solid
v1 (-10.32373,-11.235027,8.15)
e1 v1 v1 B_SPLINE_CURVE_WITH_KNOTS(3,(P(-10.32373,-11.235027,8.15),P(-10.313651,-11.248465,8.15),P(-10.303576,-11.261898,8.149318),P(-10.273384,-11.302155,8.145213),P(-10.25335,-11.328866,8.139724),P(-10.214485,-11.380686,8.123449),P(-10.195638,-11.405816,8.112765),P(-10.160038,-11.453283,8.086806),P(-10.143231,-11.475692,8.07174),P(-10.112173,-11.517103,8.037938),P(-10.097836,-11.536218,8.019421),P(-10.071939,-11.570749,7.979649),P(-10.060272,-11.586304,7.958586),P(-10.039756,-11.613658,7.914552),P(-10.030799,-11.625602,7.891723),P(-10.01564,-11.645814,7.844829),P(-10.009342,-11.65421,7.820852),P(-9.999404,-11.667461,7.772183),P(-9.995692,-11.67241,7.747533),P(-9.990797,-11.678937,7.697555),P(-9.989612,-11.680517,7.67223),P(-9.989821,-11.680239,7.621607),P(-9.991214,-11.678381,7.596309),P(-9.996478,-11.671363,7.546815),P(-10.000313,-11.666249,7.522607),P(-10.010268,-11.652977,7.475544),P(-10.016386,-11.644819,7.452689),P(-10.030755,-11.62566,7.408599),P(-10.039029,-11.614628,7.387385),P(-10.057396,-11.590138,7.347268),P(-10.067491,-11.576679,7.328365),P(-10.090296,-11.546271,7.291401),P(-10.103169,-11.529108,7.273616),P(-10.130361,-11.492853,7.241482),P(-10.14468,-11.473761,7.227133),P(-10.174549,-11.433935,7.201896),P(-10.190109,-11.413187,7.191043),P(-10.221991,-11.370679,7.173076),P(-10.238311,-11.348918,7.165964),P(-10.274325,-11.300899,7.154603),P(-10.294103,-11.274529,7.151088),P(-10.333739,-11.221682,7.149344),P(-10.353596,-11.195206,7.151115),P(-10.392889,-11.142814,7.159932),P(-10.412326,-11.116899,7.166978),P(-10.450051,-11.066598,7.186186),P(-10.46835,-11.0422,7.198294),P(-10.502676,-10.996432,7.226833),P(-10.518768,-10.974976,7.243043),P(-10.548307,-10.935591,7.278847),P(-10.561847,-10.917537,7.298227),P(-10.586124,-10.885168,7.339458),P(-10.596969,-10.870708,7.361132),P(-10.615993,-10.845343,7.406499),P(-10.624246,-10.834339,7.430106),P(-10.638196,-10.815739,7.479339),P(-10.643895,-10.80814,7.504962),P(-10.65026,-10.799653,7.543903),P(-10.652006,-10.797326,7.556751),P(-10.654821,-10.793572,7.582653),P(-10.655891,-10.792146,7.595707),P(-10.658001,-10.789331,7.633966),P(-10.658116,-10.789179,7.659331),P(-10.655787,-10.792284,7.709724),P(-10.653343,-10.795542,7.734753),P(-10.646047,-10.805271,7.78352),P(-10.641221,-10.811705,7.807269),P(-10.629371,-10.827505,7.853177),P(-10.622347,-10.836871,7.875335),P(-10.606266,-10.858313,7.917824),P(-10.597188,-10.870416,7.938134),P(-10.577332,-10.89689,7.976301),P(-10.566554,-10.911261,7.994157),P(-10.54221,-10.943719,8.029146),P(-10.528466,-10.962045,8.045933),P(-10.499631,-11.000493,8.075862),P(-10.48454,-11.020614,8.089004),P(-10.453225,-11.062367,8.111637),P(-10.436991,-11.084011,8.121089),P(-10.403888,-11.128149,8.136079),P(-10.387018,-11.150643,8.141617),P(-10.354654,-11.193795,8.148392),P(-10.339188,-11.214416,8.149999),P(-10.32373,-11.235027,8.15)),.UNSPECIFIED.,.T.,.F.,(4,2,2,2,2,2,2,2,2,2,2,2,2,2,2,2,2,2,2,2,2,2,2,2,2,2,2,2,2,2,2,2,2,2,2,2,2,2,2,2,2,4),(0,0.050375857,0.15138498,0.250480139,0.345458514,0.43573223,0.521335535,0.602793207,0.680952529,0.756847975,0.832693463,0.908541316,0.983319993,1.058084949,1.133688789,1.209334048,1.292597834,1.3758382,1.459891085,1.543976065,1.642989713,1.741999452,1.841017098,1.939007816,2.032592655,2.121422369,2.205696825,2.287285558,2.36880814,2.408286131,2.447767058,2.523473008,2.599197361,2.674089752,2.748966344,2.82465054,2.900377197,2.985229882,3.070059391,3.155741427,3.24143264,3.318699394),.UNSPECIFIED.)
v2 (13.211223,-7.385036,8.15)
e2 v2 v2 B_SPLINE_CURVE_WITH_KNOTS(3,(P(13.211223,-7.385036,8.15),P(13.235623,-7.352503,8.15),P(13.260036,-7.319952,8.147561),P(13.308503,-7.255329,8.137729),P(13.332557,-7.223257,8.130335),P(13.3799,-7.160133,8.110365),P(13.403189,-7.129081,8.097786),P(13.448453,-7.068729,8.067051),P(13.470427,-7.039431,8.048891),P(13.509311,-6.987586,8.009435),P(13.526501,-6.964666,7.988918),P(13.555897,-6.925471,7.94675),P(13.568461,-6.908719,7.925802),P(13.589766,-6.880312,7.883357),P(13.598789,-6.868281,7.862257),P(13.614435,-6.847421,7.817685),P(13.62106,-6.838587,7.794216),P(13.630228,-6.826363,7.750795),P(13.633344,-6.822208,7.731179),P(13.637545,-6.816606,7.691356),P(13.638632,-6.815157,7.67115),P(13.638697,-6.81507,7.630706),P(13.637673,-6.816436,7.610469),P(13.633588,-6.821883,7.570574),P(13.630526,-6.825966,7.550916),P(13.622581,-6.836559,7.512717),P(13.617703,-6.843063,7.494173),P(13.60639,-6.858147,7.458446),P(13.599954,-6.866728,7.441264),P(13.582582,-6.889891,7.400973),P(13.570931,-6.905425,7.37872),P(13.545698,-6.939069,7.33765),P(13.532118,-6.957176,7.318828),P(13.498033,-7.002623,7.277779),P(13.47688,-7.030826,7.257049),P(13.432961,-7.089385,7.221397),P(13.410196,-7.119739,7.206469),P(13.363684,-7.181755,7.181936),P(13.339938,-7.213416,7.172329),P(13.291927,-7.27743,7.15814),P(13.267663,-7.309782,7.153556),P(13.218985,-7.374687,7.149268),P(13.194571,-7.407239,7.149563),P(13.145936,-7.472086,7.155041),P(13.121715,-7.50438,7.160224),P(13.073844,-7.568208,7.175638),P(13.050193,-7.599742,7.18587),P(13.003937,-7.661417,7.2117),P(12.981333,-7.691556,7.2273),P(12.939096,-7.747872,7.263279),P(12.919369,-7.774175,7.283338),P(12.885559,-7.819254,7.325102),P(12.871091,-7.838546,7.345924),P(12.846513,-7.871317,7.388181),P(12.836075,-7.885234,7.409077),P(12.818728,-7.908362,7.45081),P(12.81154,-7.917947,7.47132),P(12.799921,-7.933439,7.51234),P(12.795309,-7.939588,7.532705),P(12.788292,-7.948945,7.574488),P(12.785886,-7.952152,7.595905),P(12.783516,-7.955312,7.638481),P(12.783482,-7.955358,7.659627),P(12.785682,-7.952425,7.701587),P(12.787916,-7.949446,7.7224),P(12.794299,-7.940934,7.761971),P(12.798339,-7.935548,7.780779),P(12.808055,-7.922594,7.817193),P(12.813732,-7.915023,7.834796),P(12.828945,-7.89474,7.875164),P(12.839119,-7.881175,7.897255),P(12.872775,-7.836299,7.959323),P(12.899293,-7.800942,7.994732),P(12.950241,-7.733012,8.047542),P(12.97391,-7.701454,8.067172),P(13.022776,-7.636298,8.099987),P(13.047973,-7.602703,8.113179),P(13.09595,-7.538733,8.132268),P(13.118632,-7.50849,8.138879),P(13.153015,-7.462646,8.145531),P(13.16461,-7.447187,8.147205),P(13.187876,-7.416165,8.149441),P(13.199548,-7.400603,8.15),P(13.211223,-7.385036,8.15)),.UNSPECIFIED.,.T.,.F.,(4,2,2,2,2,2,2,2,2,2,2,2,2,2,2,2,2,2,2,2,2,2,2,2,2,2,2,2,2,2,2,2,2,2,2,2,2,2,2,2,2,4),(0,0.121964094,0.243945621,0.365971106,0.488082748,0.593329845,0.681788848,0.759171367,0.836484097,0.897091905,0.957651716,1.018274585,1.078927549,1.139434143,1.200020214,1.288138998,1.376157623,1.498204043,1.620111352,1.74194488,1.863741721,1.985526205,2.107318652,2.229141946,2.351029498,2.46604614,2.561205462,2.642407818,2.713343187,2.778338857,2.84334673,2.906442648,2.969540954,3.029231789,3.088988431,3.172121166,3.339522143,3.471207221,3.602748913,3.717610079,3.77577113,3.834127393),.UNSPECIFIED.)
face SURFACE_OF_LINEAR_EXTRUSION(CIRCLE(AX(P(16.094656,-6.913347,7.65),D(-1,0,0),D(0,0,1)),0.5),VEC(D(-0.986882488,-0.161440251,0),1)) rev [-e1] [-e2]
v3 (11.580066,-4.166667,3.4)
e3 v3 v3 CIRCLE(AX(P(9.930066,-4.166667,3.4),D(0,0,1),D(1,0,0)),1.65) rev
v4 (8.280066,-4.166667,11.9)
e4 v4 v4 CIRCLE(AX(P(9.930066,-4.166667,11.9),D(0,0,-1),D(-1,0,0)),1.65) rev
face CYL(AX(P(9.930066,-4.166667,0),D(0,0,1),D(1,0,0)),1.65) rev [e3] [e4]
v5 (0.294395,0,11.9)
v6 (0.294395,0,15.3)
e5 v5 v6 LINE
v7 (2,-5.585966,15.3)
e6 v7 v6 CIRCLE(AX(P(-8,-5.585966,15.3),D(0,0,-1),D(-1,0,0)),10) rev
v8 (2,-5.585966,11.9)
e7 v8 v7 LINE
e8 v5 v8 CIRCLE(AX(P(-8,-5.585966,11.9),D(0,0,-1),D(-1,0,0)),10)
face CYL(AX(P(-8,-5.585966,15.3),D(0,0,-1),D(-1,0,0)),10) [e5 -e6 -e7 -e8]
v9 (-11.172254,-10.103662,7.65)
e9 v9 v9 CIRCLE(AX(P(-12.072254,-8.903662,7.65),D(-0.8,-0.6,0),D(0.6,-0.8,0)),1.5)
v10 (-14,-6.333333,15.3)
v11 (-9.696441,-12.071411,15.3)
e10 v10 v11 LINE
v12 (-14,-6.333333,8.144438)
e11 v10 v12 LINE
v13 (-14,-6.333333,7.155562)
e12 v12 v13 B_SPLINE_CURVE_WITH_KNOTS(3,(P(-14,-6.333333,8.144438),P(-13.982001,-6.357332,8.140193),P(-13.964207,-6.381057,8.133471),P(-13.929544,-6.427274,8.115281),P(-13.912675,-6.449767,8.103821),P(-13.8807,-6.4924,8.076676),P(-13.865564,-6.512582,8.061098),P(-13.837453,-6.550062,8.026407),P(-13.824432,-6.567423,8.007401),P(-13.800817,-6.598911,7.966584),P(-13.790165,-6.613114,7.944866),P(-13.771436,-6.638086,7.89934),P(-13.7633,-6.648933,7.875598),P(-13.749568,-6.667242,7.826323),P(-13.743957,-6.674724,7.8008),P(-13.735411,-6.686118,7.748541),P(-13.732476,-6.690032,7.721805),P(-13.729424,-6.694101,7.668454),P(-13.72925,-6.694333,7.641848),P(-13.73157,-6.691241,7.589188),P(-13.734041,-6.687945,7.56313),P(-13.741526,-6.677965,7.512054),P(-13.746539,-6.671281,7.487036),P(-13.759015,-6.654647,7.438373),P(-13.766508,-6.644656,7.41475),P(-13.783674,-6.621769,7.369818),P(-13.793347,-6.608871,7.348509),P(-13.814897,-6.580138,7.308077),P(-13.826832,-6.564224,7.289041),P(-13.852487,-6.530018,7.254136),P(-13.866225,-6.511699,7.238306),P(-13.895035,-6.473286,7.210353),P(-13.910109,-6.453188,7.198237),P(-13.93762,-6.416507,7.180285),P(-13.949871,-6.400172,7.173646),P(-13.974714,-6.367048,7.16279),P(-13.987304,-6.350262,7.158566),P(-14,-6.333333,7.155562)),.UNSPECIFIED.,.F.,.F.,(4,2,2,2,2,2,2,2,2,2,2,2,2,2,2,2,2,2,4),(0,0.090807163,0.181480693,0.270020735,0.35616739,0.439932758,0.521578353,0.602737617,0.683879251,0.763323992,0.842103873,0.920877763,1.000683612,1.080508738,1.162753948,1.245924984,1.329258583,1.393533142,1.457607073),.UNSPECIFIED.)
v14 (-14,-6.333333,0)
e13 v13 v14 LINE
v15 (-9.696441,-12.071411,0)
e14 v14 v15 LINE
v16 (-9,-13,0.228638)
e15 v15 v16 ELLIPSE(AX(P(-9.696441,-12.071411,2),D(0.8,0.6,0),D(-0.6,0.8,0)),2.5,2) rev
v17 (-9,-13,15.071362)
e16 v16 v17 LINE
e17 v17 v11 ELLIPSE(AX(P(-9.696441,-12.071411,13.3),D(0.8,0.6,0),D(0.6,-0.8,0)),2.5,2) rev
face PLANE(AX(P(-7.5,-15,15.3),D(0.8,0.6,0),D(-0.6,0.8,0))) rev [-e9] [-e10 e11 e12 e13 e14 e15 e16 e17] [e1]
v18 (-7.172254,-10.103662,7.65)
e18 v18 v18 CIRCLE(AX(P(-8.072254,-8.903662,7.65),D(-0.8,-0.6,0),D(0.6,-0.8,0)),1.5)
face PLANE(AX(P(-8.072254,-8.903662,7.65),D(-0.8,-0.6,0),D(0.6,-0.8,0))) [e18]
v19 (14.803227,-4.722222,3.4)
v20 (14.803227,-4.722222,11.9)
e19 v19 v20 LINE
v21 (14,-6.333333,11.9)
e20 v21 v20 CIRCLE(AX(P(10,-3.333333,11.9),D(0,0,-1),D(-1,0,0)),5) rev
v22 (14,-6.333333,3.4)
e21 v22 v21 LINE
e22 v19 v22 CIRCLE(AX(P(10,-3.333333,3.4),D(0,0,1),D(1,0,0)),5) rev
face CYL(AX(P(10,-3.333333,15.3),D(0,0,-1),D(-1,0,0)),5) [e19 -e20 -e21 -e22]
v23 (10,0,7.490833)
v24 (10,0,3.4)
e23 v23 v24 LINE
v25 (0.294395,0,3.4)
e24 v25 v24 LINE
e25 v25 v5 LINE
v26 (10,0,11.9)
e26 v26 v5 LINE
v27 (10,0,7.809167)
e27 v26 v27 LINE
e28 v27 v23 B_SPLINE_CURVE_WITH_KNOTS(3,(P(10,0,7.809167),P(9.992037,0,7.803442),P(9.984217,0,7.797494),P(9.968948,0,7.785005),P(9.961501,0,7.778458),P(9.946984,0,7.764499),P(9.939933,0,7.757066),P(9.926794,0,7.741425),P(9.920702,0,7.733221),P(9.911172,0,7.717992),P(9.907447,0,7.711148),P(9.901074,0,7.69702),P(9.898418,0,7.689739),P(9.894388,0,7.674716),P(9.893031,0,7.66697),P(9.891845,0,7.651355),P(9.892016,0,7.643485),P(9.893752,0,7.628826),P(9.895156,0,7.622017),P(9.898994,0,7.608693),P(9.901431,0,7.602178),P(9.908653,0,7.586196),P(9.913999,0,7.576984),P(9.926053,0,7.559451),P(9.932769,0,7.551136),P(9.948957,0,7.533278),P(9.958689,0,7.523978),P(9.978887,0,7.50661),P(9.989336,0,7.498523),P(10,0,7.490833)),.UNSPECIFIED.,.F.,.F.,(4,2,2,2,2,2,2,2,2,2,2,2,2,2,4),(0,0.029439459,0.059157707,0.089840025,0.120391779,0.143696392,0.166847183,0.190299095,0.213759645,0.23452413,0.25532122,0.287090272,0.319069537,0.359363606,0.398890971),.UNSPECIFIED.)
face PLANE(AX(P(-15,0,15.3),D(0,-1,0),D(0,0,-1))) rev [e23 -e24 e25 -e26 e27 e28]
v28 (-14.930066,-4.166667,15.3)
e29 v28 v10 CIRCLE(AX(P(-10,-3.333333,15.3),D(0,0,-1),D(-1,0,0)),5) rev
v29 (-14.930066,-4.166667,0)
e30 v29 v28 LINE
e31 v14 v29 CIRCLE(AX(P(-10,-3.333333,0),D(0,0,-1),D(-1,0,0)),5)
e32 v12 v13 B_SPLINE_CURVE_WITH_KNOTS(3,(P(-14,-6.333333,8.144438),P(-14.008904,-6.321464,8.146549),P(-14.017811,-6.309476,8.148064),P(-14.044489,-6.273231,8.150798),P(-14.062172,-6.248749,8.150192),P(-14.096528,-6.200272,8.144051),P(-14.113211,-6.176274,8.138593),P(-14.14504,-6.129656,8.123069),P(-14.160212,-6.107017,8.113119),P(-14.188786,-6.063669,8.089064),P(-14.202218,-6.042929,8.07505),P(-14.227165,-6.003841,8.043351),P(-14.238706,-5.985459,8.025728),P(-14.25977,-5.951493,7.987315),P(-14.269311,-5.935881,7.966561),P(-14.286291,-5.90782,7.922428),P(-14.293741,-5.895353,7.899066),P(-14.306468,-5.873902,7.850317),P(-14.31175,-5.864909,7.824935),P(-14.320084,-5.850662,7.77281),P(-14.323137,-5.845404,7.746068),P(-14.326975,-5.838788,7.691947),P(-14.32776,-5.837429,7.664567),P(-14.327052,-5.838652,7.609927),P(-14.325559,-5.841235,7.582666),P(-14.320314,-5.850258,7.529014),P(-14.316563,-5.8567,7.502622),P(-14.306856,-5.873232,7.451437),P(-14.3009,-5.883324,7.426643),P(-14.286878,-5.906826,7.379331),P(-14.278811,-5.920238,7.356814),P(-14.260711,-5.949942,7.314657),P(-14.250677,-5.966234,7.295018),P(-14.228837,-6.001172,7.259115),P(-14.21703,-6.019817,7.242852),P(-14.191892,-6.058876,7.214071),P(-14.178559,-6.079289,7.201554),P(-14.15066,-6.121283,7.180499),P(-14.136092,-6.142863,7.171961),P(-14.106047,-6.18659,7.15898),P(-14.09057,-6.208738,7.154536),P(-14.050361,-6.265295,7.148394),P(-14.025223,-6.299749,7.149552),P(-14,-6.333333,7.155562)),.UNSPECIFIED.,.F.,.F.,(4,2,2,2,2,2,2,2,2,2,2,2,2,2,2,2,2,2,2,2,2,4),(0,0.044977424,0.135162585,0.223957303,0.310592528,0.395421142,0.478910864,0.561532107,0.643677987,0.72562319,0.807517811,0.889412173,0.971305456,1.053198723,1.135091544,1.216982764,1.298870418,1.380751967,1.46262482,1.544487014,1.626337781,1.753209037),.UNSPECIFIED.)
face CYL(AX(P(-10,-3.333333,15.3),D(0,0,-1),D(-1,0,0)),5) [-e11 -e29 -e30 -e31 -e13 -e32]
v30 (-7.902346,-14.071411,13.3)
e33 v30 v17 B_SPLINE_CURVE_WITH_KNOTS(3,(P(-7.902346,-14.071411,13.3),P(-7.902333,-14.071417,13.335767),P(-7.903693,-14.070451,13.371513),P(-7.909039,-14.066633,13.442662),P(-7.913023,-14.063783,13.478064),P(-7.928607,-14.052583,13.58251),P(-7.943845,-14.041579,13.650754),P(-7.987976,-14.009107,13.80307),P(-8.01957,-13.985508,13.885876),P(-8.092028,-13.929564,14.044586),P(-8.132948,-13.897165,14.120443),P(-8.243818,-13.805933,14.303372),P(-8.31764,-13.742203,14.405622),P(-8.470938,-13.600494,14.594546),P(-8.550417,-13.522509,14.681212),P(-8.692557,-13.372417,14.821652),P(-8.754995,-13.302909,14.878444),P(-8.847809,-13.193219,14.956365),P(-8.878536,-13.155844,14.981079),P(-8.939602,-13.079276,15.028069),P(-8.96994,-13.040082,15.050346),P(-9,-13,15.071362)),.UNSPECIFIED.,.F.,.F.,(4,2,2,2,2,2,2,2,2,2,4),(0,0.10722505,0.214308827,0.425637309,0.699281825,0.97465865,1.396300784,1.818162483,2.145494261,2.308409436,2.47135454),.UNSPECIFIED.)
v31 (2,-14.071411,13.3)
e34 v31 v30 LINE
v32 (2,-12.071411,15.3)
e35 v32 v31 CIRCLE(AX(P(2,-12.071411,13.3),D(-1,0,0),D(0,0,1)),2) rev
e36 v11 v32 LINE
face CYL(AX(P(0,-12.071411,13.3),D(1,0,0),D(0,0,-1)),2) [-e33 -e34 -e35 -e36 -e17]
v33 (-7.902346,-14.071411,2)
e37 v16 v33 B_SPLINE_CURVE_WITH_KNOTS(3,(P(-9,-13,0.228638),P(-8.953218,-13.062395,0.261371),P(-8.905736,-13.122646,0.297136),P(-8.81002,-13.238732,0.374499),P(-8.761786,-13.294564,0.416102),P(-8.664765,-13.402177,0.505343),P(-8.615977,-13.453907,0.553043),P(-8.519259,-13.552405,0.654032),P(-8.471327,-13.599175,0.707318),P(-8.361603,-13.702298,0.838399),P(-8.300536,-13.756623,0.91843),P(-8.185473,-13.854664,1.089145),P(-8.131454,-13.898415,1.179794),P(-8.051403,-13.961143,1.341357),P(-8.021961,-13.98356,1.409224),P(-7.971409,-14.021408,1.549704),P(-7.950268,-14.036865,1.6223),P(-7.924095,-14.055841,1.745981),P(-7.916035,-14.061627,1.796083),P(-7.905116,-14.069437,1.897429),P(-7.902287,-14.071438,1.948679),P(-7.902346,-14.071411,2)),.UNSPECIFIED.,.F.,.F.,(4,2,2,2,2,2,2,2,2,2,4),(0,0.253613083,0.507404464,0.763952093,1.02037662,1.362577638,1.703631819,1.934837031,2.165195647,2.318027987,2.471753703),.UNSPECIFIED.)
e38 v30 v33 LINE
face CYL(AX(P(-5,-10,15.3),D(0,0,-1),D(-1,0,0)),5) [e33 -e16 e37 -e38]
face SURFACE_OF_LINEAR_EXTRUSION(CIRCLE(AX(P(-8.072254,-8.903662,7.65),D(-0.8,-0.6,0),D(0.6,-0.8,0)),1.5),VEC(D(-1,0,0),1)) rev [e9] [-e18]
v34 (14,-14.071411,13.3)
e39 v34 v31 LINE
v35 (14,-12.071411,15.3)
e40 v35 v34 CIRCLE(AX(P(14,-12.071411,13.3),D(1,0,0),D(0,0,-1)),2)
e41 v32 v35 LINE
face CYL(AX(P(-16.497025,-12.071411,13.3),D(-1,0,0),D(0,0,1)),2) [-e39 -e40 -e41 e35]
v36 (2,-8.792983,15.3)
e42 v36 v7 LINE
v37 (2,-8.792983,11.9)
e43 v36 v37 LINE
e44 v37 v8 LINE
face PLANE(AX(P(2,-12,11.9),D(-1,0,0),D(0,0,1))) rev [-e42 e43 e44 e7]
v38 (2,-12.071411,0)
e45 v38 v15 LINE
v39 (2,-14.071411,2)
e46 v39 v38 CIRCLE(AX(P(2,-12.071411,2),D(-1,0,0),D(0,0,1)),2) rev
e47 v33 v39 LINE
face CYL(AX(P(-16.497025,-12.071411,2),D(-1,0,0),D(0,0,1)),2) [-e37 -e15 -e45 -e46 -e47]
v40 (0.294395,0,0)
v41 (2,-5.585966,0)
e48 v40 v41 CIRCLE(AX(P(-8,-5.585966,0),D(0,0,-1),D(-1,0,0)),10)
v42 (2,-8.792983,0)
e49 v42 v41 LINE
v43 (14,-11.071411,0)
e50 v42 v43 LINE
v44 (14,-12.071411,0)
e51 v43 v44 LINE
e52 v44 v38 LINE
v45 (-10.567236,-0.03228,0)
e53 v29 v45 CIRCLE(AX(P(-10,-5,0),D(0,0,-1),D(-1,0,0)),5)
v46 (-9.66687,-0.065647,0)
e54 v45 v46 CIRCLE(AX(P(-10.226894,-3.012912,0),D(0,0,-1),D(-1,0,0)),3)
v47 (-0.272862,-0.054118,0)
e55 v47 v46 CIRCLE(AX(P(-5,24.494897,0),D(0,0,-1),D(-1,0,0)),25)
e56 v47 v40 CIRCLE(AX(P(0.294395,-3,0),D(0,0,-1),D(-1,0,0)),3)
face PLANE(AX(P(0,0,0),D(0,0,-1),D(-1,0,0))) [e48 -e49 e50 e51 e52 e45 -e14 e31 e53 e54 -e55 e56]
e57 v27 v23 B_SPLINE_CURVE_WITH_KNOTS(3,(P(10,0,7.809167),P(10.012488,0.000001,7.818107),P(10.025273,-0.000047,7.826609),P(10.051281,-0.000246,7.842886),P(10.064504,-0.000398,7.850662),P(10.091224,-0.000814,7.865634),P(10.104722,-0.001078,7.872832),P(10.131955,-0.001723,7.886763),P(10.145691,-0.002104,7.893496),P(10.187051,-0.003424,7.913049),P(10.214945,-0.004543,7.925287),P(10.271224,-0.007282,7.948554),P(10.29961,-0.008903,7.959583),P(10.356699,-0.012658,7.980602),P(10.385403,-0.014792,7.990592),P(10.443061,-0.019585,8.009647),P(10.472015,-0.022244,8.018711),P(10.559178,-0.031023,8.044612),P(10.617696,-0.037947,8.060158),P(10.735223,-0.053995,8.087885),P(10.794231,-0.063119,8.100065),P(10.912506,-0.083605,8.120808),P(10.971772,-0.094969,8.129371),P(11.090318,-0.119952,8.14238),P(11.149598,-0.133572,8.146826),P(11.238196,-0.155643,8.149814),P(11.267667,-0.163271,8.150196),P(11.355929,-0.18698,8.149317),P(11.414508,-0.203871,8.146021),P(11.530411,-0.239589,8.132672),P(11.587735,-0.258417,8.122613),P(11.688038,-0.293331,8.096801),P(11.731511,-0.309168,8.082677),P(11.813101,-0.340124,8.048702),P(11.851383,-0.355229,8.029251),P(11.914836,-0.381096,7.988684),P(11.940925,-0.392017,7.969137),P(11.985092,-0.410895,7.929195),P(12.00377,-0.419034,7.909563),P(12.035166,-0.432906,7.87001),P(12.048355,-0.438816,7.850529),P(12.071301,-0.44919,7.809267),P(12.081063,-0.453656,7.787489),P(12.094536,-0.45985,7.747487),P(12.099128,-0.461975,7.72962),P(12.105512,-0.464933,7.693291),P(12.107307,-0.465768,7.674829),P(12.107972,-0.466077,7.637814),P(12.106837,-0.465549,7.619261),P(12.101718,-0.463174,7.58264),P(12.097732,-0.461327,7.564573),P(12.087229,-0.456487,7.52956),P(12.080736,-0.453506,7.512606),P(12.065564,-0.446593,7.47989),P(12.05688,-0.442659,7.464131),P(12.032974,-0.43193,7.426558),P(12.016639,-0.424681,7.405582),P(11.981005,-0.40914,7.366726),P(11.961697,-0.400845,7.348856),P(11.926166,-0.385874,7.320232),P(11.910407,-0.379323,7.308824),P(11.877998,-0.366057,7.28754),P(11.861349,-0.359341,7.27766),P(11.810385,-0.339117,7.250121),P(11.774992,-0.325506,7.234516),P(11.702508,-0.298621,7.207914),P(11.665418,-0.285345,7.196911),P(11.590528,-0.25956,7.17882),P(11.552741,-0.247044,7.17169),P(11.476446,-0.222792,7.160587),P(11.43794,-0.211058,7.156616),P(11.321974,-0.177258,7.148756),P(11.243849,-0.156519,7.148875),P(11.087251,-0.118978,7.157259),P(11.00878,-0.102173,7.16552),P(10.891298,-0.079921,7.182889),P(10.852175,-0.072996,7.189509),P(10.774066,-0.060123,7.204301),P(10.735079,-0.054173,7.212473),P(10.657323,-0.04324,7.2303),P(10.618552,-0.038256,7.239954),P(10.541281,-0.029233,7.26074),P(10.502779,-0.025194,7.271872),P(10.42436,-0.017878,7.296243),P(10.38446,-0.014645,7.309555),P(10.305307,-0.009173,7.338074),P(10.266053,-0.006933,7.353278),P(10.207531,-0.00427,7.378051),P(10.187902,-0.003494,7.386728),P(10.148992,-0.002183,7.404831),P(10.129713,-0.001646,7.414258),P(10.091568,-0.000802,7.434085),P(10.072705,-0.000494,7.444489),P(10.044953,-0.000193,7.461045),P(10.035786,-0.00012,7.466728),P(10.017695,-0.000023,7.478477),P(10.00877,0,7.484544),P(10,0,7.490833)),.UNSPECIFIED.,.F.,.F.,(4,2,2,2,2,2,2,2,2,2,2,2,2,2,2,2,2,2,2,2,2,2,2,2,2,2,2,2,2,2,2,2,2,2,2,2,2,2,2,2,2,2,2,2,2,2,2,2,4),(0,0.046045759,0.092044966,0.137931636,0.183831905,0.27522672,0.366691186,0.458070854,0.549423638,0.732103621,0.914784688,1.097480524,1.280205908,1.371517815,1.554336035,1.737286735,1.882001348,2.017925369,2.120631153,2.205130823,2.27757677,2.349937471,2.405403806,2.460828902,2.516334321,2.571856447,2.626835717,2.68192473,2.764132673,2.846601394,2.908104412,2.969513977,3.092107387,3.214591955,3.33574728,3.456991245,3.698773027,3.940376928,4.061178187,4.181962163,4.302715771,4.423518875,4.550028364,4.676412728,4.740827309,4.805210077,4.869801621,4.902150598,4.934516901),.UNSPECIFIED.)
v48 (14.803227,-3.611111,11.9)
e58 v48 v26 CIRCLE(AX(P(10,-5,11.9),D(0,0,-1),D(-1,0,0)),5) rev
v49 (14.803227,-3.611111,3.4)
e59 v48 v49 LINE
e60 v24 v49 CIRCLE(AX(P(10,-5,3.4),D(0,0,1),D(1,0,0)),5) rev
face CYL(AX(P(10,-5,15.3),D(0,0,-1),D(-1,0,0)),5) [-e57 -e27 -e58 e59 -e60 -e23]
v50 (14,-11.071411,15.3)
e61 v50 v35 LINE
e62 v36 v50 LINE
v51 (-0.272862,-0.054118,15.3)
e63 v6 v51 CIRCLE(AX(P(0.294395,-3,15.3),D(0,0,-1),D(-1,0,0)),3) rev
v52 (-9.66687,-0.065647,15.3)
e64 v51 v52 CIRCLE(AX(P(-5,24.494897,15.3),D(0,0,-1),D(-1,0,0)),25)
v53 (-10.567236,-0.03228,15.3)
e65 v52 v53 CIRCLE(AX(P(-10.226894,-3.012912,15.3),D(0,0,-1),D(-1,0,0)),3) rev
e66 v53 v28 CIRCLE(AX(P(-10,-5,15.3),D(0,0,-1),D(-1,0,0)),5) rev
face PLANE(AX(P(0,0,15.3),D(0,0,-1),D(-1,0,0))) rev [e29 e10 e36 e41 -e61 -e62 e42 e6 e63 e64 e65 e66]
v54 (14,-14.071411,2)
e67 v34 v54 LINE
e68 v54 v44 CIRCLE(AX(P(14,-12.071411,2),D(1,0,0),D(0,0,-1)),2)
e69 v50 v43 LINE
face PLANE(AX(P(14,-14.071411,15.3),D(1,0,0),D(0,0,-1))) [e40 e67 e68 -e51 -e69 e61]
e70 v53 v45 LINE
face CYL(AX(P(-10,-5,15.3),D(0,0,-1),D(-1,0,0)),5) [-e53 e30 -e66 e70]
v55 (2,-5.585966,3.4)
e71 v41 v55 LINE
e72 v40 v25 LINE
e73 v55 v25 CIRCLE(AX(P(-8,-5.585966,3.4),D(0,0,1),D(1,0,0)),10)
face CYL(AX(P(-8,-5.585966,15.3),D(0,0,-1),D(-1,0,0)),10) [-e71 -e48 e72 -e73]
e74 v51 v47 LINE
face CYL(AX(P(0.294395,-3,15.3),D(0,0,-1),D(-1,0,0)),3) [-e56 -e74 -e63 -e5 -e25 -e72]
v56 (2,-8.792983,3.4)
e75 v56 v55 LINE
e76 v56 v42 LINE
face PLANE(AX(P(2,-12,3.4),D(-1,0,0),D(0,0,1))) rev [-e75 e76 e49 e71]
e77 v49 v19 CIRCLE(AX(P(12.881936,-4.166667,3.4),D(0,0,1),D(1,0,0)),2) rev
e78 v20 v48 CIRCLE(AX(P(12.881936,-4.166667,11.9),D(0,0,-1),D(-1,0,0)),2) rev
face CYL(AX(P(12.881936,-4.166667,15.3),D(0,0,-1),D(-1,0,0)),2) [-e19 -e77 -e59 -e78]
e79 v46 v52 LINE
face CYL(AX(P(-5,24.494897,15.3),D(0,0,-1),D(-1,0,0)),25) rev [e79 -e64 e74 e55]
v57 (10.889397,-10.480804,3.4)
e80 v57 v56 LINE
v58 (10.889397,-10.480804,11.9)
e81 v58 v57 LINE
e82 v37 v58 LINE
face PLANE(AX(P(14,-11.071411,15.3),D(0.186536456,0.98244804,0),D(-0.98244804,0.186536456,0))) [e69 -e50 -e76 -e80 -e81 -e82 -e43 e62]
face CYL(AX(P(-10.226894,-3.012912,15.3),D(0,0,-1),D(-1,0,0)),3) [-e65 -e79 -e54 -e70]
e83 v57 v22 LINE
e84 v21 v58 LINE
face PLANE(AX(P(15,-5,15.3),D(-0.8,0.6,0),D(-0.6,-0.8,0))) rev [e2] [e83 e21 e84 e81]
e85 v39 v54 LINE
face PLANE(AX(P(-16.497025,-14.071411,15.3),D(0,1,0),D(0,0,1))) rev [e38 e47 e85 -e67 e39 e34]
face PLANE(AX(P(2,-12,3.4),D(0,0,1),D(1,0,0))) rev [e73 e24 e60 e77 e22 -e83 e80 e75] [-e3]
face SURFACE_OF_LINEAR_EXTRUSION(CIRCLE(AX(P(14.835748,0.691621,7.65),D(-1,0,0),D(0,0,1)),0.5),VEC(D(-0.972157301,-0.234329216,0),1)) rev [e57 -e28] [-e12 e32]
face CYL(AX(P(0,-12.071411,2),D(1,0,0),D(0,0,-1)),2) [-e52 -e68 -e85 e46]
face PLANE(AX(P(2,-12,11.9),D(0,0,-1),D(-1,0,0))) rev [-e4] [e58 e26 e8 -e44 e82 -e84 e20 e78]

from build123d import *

# Parameters (mm, degrees)
BOSS_EXTRUDE1_DEPTH = 15.3
FILLET1_R           = 5
SKETCH3_R           = 1.6499999999999986
CUT_EXTRUDE1_DEPTH  = 27.1150700798197
SKETCH6_W           = 13.000000000000002
SKETCH6_H           = 3.3999999999999995
SKETCH6_H_2         = 3.4000000000000004
CUT_EXTRUDE4_DEPTH  = 12
CUT_EXTRUDE5_DEPTH  = 27.1150700798197
FILLET5_R           = 3
FILLET7_R           = 10
FILLET8_R           = 2
SKETCH14_W          = 39.168400235904954
SKETCH14_H          = 4.224796924987116
CUT_EXTRUDE8_DEPTH  = 27.115070253014974
FILLET10_R          = 2
BOSS_EXTRUDE2_START = -15.3
BOSS_EXTRUDE2_DEPTH = 15.3
FILLET11_R          = 2
FILLET15_R          = 2
SKETCH8_R           = 0.5000000000000026
CUT_EXTRUDE10_DEPTH = 38.472055021272986
SKETCH8_5_R         = 0.5000000000000026
CUT_EXTRUDE11_DEPTH = 37.89801687295938
SKETCH19_R          = 1.5000000000000007
CUT_EXTRUDE12_DEPTH = 4


with BuildPart() as part:
    # Sketch2 → Boss-Extrude1 (new body)
    with BuildSketch(Plane.XY):
        Polygon((-15, 0), (15, 0), (15, -5), (7.5, -15.000000000000002), (-7.5, -15.000000000000002), (-15, -5), align=None)
    extrude(amount=BOSS_EXTRUDE1_DEPTH)

    # Fillet1
    # the kernel refuses this fillet: 5 mm, written as the material it takes off along each edge
    with BuildSketch(Plane(origin=(15, 0, -12.499999999999998), x_dir=(-1, 0, 0), z_dir=(0, 0, 1))) as fillet1_piece_1:
        with BuildLine():
            CenterArc((FILLET1_R, FILLET1_R), FILLET1_R, 180, 90)
            Line((0, FILLET1_R), (0, 0))
            Line((0, 0), (FILLET1_R, 0))
        make_face()
    extrude(amount=40.3, mode=Mode.SUBTRACT)
    with BuildSketch(Plane(origin=(-15, 0, -12.499999999999998), x_dir=(1, 0, 0), z_dir=(0, 0, 1))) as fillet1_piece_2:
        with BuildLine():
            CenterArc((FILLET1_R, -FILLET1_R), FILLET1_R, 90, 90)
            Line((0, -FILLET1_R), (0, 0))
            Line((0, 0), (FILLET1_R, 0))
        make_face()
    extrude(amount=40.3, mode=Mode.SUBTRACT)
    with BuildSketch(Plane(origin=(15, -5, -4.166666666666666), x_dir=(0, 1, 0), z_dir=(0, 0, 1))) as fillet1_piece_3:
        with BuildLine():
            CenterArc((FILLET1_R * 0.333333333333, FILLET1_R), FILLET1_R, 233.13010235415598, 36.86989764584405)
            Line((-FILLET1_R * 0.266666666667, FILLET1_R * 0.2), (0, 0))
            Line((0, 0), (FILLET1_R * 0.333333333333, 0))
        make_face()
    extrude(amount=23.633333333333333, mode=Mode.SUBTRACT)
    with BuildSketch(Plane(origin=(7.5, -15.000000000000002, -6.250000000000007), x_dir=(0.6000000000000001, 0.7999999999999998, 0), z_dir=(0, 0, 1))) as fillet1_piece_4:
        with BuildLine():
            CenterArc((FILLET1_R * 0.5, FILLET1_R), FILLET1_R, 216.86989764584402, 53.13010235415601)
            Line((-FILLET1_R * 0.3, FILLET1_R * 0.4), (0, 0))
            Line((0, 0), (FILLET1_R * 0.5, 1.8e-16))
        make_face()
    extrude(amount=27.80000000000001, mode=Mode.SUBTRACT)
    with BuildSketch(Plane(origin=(-7.5, -15.000000000000002, -6.2500000000000036), x_dir=(1, 0, 0), z_dir=(0, 0, 1))) as fillet1_piece_5:
        with BuildLine():
            CenterArc((FILLET1_R * 0.5, FILLET1_R), FILLET1_R, 216.869897645844, 53.13010235415601)
            Line((-FILLET1_R * 0.3, FILLET1_R * 0.4), (0, 0))
            Line((0, 0), (FILLET1_R * 0.5, 0))
        make_face()
    extrude(amount=27.800000000000008, mode=Mode.SUBTRACT)
    with BuildSketch(Plane(origin=(-15, -5, -4.166666666666666), x_dir=(0.6000000000000004, -0.7999999999999998, 0), z_dir=(0, 0, 1))) as fillet1_piece_6:
        with BuildLine():
            CenterArc((FILLET1_R * 0.333333333333, FILLET1_R), FILLET1_R, 233.13010235415595, 36.86989764584399)
            Line((-FILLET1_R * 0.266666666667, FILLET1_R * 0.2), (0, 0))
            Line((0, 0), (FILLET1_R * 0.333333333333, -3e-17))
        make_face()
    extrude(amount=23.63333333333333, mode=Mode.SUBTRACT)

    # Sketch3 → Cut-Extrude1 (cut, through all)
    with BuildSketch(Plane.XY.offset(15.3)):
        with Locations((9.930066485916347, -4.166666666666668)):
            Circle(SKETCH3_R)
    extrude(amount=-CUT_EXTRUDE1_DEPTH, mode=Mode.SUBTRACT)

    # Sketch6 → Cut-Extrude4 (cut)
    with BuildSketch(Plane(origin=(0, 0, 0), x_dir=(1, 0, 0), z_dir=(0, 1, 0))):
        with Locations((8.5, -1.6999999999999997)):
            Rectangle(SKETCH6_W, SKETCH6_H)
        with Locations((8.5, -13.600000000000001)):
            Rectangle(SKETCH6_W, SKETCH6_H_2)
    extrude(amount=-CUT_EXTRUDE4_DEPTH, mode=Mode.SUBTRACT)

    # Sketch7 → Cut-Extrude5 (cut, through all)
    with BuildSketch(Plane(origin=(0, 0, 0), x_dir=(-1, 0, 0), z_dir=(0, 0, -1))):
        with BuildLine():
            Line((0, 0), (9.999999999999998, 0))
            ThreePointArc((9.999999999999998, 0), (5.000000000000001, -0.5051025721682194), (0, 0))
        make_face()
    extrude(amount=-CUT_EXTRUDE5_DEPTH, mode=Mode.SUBTRACT)

    # Fillet5
    fillet5_edges = [part.edges().sort_by_distance(p)[0] for p in [
        (0, 1.78e-15, 7.65),
        (-10, 0, 7.649999999999999),
    ]]
    fillet(fillet5_edges, radius=FILLET5_R)

    # Fillet7
    # the kernel refuses this fillet: 10 mm, written as the material it takes off along each edge
    with BuildSketch(Plane(origin=(2, 0, 29.264915023330374), x_dir=(-1.0, -2.233978436482516e-12, 0), z_dir=(0, 0, -1))) as fillet7_piece_1:
        with BuildLine():
            CenterArc((10.000000000012479, -5.585966009309811), FILLET7_R, 146.04120119417382, 33.95879880595419)
            Line((1.247893e-11, -5.58596600933215), (-0.19999999998752124, -5.585966009332597))
            Line((-0.19999999998752124, -5.585966009332597), (-0.20000000000000018, -4.468e-13))
            Line((-0.20000000000000018, -4.468e-13), (-4.468e-13, 0.2))
            ThreePointArc((-4.468e-13, 0.2), (0.852802640859637, 0.20000000000190515), (1.5397173873543193, 0.11171932018619622))
            Line((1.5397173873543193, 0.11171932018619622), (1.7056052817201657, 0))
        make_face()
    extrude(amount=17.364915023330376, mode=Mode.SUBTRACT)
    with BuildSketch(Plane(origin=(2, 0, 29.264915023330374), x_dir=(-1.0, -2.233978436482516e-12, 0), z_dir=(0, 0, -1))) as fillet7_piece_2_section:
        with BuildLine():
            CenterArc((10.000000000012479, -5.585966009309811), FILLET7_R, 146.04120119417382, 33.95879880595419)
            Line((1.247893e-11, -5.58596600933215), (-0.19999999998752124, -5.585966009332597))
            Line((-0.19999999998752124, -5.585966009332597), (-0.20000000000000018, -4.468e-13))
            Line((-0.20000000000000018, -4.468e-13), (-4.468e-13, 0.2))
            ThreePointArc((-4.468e-13, 0.2), (0.852802640859637, 0.20000000000190515), (1.5397173873543193, 0.11171932018619622))
            Line((1.5397173873543193, 0.11171932018619622), (1.7056052817201657, 0))
        make_face()
    fillet7_piece_2 = extrude(amount=31.32983004666075, mode=Mode.PRIVATE)
    fillet7_piece_2 = split(fillet7_piece_2, bisect_by=Plane(origin=(2, 0, 3.3999999999999986), z_dir=(0, 0, -1)), keep=Keep.TOP, mode=Mode.PRIVATE)
    add(fillet7_piece_2, mode=Mode.SUBTRACT)
    with BuildSketch(Plane(origin=(2, 0, -13.96491502333037), x_dir=(-1.0, -2.2334576955882334e-12, 0), z_dir=(0, 0, 1))) as fillet7_piece_3:
        with BuildLine():
            CenterArc((10.000000000012475, 5.585966009309815), FILLET7_R, 179.99999999987205, 33.95879880595419)
            Line((1.247602e-11, 5.585966009332149), (-0.19999999998752416, 5.585966009332596))
            Line((-0.19999999998752416, 5.585966009332596), (-0.20000000000000018, 4.4669e-13))
            Line((-0.20000000000000018, 4.4669e-13), (-4.4669e-13, -0.2))
            ThreePointArc((-4.4669e-13, -0.2), (0.8528026408596371, -0.2000000000019047), (1.5397173873543175, -0.1117193201861963))
            Line((1.5397173873543175, -0.1117193201861963), (1.705605281720164, 0))
        make_face()
    extrude(amount=17.36491502333037, mode=Mode.SUBTRACT)
    with BuildSketch(Plane(origin=(2, 0, -13.96491502333037), x_dir=(-1.0, -2.2334576955882334e-12, 0), z_dir=(0, 0, 1))) as fillet7_piece_4_section:
        with BuildLine():
            CenterArc((10.000000000012475, 5.585966009309815), FILLET7_R, 179.99999999987205, 33.95879880595419)
            Line((1.247602e-11, 5.585966009332149), (-0.19999999998752416, 5.585966009332596))
            Line((-0.19999999998752416, 5.585966009332596), (-0.20000000000000018, 4.4669e-13))
            Line((-0.20000000000000018, 4.4669e-13), (-4.4669e-13, -0.2))
            ThreePointArc((-4.4669e-13, -0.2), (0.8528026408596371, -0.2000000000019047), (1.5397173873543175, -0.1117193201861963))
            Line((1.5397173873543175, -0.1117193201861963), (1.705605281720164, 0))
        make_face()
    fillet7_piece_4 = extrude(amount=31.329830046660742, mode=Mode.PRIVATE)
    fillet7_piece_4 = split(fillet7_piece_4, bisect_by=Plane(origin=(2, 0, 11.899999999999999), z_dir=(0, 0, 1)), keep=Keep.TOP, mode=Mode.PRIVATE)
    add(fillet7_piece_4, mode=Mode.SUBTRACT)

    # Fillet8
    fillet8_edges = [part.edges().sort_by_distance(p)[0] for p in [
        (14.930066485916488, -4.1666666666675, 7.649999999999999),
    ]]
    fillet(fillet8_edges, radius=FILLET8_R)

    # Sketch14 → Cut-Extrude8 (cut, through all)
    with BuildSketch(Plane(origin=(0, 0, 0), x_dir=(-1, 0, 0), z_dir=(0, 0, -1))):
        with Locations((-3.087175127191699, -16.183809827012396)):
            Rectangle(SKETCH14_W, SKETCH14_H)
    extrude(amount=-CUT_EXTRUDE8_DEPTH, mode=Mode.SUBTRACT)

    # Fillet10
    fillet10_edges = [part.edges().sort_by_distance(p)[0] for p in [
        (0, -14.071411364518838, 0),
        (0, -14.071411364518838, 15.3),
    ]]
    fillet(fillet10_edges, radius=FILLET10_R)

    # Sketch15 → Boss-Extrude2 (add)
    with BuildSketch(Plane(origin=(0, 0, 0), x_dir=(-1, 0, 0), z_dir=(0, 0, -1)).offset(BOSS_EXTRUDE2_START)):
        Polygon((-14.000000000000002, -11.071411364518834), (-2, -8.79298300465997), (-2, -14.071411364518838), (-14.000000000000002, -14.071411364518836), align=None)
    extrude(amount=BOSS_EXTRUDE2_DEPTH)

    # Fillet11
    fillet11_edges = [part.edges().sort_by_distance(p)[0] for p in [
        (8, -14.071411364518838, 0),
    ]]
    fillet(fillet11_edges, radius=FILLET11_R)

    # Fillet15
    fillet15_edges = [part.edges().sort_by_distance(p)[0] for p in [
        (8, -14.071411364518838, 15.3),
    ]]
    fillet(fillet15_edges, radius=FILLET15_R)

    # Sketch8 → Cut-Extrude10 (cut, through all, along a direction that is not the sketch's normal)
    with BuildSketch(Plane.ZY.offset(15)):
        with Locations((7.65, -6.500000000000001)):
            Circle(SKETCH8_R)
    extrude(amount=-CUT_EXTRUDE10_DEPTH, dir=(-0.9721573012761343, -0.23432921622261157, 0), mode=Mode.SUBTRACT)

    # Sketch8<5> → Cut-Extrude11 (cut, through all, along a direction that is not the sketch's normal)
    with BuildSketch(Plane.ZY.offset(15)):
        with Locations((7.65, -12)):
            Circle(SKETCH8_5_R)
    extrude(amount=-CUT_EXTRUDE11_DEPTH, dir=(-0.9868824880574057, -0.1614402513799591, 0), mode=Mode.SUBTRACT)

    # Sketch19 → Cut-Extrude12 (cut, along a direction that is not the sketch's normal)
    with BuildSketch(Plane(origin=(-12.000000000000007, -9.000000000000004, 0), x_dir=(0, 0, 1), z_dir=(-0.8, -0.6000000000000001, 0))):
        with Locations((7.649999999999997, 0.12042260901835285)):
            Circle(SKETCH19_R)
    extrude(amount=-CUT_EXTRUDE12_DEPTH, dir=(-1, 0, 0), mode=Mode.SUBTRACT)


solid = part.part
